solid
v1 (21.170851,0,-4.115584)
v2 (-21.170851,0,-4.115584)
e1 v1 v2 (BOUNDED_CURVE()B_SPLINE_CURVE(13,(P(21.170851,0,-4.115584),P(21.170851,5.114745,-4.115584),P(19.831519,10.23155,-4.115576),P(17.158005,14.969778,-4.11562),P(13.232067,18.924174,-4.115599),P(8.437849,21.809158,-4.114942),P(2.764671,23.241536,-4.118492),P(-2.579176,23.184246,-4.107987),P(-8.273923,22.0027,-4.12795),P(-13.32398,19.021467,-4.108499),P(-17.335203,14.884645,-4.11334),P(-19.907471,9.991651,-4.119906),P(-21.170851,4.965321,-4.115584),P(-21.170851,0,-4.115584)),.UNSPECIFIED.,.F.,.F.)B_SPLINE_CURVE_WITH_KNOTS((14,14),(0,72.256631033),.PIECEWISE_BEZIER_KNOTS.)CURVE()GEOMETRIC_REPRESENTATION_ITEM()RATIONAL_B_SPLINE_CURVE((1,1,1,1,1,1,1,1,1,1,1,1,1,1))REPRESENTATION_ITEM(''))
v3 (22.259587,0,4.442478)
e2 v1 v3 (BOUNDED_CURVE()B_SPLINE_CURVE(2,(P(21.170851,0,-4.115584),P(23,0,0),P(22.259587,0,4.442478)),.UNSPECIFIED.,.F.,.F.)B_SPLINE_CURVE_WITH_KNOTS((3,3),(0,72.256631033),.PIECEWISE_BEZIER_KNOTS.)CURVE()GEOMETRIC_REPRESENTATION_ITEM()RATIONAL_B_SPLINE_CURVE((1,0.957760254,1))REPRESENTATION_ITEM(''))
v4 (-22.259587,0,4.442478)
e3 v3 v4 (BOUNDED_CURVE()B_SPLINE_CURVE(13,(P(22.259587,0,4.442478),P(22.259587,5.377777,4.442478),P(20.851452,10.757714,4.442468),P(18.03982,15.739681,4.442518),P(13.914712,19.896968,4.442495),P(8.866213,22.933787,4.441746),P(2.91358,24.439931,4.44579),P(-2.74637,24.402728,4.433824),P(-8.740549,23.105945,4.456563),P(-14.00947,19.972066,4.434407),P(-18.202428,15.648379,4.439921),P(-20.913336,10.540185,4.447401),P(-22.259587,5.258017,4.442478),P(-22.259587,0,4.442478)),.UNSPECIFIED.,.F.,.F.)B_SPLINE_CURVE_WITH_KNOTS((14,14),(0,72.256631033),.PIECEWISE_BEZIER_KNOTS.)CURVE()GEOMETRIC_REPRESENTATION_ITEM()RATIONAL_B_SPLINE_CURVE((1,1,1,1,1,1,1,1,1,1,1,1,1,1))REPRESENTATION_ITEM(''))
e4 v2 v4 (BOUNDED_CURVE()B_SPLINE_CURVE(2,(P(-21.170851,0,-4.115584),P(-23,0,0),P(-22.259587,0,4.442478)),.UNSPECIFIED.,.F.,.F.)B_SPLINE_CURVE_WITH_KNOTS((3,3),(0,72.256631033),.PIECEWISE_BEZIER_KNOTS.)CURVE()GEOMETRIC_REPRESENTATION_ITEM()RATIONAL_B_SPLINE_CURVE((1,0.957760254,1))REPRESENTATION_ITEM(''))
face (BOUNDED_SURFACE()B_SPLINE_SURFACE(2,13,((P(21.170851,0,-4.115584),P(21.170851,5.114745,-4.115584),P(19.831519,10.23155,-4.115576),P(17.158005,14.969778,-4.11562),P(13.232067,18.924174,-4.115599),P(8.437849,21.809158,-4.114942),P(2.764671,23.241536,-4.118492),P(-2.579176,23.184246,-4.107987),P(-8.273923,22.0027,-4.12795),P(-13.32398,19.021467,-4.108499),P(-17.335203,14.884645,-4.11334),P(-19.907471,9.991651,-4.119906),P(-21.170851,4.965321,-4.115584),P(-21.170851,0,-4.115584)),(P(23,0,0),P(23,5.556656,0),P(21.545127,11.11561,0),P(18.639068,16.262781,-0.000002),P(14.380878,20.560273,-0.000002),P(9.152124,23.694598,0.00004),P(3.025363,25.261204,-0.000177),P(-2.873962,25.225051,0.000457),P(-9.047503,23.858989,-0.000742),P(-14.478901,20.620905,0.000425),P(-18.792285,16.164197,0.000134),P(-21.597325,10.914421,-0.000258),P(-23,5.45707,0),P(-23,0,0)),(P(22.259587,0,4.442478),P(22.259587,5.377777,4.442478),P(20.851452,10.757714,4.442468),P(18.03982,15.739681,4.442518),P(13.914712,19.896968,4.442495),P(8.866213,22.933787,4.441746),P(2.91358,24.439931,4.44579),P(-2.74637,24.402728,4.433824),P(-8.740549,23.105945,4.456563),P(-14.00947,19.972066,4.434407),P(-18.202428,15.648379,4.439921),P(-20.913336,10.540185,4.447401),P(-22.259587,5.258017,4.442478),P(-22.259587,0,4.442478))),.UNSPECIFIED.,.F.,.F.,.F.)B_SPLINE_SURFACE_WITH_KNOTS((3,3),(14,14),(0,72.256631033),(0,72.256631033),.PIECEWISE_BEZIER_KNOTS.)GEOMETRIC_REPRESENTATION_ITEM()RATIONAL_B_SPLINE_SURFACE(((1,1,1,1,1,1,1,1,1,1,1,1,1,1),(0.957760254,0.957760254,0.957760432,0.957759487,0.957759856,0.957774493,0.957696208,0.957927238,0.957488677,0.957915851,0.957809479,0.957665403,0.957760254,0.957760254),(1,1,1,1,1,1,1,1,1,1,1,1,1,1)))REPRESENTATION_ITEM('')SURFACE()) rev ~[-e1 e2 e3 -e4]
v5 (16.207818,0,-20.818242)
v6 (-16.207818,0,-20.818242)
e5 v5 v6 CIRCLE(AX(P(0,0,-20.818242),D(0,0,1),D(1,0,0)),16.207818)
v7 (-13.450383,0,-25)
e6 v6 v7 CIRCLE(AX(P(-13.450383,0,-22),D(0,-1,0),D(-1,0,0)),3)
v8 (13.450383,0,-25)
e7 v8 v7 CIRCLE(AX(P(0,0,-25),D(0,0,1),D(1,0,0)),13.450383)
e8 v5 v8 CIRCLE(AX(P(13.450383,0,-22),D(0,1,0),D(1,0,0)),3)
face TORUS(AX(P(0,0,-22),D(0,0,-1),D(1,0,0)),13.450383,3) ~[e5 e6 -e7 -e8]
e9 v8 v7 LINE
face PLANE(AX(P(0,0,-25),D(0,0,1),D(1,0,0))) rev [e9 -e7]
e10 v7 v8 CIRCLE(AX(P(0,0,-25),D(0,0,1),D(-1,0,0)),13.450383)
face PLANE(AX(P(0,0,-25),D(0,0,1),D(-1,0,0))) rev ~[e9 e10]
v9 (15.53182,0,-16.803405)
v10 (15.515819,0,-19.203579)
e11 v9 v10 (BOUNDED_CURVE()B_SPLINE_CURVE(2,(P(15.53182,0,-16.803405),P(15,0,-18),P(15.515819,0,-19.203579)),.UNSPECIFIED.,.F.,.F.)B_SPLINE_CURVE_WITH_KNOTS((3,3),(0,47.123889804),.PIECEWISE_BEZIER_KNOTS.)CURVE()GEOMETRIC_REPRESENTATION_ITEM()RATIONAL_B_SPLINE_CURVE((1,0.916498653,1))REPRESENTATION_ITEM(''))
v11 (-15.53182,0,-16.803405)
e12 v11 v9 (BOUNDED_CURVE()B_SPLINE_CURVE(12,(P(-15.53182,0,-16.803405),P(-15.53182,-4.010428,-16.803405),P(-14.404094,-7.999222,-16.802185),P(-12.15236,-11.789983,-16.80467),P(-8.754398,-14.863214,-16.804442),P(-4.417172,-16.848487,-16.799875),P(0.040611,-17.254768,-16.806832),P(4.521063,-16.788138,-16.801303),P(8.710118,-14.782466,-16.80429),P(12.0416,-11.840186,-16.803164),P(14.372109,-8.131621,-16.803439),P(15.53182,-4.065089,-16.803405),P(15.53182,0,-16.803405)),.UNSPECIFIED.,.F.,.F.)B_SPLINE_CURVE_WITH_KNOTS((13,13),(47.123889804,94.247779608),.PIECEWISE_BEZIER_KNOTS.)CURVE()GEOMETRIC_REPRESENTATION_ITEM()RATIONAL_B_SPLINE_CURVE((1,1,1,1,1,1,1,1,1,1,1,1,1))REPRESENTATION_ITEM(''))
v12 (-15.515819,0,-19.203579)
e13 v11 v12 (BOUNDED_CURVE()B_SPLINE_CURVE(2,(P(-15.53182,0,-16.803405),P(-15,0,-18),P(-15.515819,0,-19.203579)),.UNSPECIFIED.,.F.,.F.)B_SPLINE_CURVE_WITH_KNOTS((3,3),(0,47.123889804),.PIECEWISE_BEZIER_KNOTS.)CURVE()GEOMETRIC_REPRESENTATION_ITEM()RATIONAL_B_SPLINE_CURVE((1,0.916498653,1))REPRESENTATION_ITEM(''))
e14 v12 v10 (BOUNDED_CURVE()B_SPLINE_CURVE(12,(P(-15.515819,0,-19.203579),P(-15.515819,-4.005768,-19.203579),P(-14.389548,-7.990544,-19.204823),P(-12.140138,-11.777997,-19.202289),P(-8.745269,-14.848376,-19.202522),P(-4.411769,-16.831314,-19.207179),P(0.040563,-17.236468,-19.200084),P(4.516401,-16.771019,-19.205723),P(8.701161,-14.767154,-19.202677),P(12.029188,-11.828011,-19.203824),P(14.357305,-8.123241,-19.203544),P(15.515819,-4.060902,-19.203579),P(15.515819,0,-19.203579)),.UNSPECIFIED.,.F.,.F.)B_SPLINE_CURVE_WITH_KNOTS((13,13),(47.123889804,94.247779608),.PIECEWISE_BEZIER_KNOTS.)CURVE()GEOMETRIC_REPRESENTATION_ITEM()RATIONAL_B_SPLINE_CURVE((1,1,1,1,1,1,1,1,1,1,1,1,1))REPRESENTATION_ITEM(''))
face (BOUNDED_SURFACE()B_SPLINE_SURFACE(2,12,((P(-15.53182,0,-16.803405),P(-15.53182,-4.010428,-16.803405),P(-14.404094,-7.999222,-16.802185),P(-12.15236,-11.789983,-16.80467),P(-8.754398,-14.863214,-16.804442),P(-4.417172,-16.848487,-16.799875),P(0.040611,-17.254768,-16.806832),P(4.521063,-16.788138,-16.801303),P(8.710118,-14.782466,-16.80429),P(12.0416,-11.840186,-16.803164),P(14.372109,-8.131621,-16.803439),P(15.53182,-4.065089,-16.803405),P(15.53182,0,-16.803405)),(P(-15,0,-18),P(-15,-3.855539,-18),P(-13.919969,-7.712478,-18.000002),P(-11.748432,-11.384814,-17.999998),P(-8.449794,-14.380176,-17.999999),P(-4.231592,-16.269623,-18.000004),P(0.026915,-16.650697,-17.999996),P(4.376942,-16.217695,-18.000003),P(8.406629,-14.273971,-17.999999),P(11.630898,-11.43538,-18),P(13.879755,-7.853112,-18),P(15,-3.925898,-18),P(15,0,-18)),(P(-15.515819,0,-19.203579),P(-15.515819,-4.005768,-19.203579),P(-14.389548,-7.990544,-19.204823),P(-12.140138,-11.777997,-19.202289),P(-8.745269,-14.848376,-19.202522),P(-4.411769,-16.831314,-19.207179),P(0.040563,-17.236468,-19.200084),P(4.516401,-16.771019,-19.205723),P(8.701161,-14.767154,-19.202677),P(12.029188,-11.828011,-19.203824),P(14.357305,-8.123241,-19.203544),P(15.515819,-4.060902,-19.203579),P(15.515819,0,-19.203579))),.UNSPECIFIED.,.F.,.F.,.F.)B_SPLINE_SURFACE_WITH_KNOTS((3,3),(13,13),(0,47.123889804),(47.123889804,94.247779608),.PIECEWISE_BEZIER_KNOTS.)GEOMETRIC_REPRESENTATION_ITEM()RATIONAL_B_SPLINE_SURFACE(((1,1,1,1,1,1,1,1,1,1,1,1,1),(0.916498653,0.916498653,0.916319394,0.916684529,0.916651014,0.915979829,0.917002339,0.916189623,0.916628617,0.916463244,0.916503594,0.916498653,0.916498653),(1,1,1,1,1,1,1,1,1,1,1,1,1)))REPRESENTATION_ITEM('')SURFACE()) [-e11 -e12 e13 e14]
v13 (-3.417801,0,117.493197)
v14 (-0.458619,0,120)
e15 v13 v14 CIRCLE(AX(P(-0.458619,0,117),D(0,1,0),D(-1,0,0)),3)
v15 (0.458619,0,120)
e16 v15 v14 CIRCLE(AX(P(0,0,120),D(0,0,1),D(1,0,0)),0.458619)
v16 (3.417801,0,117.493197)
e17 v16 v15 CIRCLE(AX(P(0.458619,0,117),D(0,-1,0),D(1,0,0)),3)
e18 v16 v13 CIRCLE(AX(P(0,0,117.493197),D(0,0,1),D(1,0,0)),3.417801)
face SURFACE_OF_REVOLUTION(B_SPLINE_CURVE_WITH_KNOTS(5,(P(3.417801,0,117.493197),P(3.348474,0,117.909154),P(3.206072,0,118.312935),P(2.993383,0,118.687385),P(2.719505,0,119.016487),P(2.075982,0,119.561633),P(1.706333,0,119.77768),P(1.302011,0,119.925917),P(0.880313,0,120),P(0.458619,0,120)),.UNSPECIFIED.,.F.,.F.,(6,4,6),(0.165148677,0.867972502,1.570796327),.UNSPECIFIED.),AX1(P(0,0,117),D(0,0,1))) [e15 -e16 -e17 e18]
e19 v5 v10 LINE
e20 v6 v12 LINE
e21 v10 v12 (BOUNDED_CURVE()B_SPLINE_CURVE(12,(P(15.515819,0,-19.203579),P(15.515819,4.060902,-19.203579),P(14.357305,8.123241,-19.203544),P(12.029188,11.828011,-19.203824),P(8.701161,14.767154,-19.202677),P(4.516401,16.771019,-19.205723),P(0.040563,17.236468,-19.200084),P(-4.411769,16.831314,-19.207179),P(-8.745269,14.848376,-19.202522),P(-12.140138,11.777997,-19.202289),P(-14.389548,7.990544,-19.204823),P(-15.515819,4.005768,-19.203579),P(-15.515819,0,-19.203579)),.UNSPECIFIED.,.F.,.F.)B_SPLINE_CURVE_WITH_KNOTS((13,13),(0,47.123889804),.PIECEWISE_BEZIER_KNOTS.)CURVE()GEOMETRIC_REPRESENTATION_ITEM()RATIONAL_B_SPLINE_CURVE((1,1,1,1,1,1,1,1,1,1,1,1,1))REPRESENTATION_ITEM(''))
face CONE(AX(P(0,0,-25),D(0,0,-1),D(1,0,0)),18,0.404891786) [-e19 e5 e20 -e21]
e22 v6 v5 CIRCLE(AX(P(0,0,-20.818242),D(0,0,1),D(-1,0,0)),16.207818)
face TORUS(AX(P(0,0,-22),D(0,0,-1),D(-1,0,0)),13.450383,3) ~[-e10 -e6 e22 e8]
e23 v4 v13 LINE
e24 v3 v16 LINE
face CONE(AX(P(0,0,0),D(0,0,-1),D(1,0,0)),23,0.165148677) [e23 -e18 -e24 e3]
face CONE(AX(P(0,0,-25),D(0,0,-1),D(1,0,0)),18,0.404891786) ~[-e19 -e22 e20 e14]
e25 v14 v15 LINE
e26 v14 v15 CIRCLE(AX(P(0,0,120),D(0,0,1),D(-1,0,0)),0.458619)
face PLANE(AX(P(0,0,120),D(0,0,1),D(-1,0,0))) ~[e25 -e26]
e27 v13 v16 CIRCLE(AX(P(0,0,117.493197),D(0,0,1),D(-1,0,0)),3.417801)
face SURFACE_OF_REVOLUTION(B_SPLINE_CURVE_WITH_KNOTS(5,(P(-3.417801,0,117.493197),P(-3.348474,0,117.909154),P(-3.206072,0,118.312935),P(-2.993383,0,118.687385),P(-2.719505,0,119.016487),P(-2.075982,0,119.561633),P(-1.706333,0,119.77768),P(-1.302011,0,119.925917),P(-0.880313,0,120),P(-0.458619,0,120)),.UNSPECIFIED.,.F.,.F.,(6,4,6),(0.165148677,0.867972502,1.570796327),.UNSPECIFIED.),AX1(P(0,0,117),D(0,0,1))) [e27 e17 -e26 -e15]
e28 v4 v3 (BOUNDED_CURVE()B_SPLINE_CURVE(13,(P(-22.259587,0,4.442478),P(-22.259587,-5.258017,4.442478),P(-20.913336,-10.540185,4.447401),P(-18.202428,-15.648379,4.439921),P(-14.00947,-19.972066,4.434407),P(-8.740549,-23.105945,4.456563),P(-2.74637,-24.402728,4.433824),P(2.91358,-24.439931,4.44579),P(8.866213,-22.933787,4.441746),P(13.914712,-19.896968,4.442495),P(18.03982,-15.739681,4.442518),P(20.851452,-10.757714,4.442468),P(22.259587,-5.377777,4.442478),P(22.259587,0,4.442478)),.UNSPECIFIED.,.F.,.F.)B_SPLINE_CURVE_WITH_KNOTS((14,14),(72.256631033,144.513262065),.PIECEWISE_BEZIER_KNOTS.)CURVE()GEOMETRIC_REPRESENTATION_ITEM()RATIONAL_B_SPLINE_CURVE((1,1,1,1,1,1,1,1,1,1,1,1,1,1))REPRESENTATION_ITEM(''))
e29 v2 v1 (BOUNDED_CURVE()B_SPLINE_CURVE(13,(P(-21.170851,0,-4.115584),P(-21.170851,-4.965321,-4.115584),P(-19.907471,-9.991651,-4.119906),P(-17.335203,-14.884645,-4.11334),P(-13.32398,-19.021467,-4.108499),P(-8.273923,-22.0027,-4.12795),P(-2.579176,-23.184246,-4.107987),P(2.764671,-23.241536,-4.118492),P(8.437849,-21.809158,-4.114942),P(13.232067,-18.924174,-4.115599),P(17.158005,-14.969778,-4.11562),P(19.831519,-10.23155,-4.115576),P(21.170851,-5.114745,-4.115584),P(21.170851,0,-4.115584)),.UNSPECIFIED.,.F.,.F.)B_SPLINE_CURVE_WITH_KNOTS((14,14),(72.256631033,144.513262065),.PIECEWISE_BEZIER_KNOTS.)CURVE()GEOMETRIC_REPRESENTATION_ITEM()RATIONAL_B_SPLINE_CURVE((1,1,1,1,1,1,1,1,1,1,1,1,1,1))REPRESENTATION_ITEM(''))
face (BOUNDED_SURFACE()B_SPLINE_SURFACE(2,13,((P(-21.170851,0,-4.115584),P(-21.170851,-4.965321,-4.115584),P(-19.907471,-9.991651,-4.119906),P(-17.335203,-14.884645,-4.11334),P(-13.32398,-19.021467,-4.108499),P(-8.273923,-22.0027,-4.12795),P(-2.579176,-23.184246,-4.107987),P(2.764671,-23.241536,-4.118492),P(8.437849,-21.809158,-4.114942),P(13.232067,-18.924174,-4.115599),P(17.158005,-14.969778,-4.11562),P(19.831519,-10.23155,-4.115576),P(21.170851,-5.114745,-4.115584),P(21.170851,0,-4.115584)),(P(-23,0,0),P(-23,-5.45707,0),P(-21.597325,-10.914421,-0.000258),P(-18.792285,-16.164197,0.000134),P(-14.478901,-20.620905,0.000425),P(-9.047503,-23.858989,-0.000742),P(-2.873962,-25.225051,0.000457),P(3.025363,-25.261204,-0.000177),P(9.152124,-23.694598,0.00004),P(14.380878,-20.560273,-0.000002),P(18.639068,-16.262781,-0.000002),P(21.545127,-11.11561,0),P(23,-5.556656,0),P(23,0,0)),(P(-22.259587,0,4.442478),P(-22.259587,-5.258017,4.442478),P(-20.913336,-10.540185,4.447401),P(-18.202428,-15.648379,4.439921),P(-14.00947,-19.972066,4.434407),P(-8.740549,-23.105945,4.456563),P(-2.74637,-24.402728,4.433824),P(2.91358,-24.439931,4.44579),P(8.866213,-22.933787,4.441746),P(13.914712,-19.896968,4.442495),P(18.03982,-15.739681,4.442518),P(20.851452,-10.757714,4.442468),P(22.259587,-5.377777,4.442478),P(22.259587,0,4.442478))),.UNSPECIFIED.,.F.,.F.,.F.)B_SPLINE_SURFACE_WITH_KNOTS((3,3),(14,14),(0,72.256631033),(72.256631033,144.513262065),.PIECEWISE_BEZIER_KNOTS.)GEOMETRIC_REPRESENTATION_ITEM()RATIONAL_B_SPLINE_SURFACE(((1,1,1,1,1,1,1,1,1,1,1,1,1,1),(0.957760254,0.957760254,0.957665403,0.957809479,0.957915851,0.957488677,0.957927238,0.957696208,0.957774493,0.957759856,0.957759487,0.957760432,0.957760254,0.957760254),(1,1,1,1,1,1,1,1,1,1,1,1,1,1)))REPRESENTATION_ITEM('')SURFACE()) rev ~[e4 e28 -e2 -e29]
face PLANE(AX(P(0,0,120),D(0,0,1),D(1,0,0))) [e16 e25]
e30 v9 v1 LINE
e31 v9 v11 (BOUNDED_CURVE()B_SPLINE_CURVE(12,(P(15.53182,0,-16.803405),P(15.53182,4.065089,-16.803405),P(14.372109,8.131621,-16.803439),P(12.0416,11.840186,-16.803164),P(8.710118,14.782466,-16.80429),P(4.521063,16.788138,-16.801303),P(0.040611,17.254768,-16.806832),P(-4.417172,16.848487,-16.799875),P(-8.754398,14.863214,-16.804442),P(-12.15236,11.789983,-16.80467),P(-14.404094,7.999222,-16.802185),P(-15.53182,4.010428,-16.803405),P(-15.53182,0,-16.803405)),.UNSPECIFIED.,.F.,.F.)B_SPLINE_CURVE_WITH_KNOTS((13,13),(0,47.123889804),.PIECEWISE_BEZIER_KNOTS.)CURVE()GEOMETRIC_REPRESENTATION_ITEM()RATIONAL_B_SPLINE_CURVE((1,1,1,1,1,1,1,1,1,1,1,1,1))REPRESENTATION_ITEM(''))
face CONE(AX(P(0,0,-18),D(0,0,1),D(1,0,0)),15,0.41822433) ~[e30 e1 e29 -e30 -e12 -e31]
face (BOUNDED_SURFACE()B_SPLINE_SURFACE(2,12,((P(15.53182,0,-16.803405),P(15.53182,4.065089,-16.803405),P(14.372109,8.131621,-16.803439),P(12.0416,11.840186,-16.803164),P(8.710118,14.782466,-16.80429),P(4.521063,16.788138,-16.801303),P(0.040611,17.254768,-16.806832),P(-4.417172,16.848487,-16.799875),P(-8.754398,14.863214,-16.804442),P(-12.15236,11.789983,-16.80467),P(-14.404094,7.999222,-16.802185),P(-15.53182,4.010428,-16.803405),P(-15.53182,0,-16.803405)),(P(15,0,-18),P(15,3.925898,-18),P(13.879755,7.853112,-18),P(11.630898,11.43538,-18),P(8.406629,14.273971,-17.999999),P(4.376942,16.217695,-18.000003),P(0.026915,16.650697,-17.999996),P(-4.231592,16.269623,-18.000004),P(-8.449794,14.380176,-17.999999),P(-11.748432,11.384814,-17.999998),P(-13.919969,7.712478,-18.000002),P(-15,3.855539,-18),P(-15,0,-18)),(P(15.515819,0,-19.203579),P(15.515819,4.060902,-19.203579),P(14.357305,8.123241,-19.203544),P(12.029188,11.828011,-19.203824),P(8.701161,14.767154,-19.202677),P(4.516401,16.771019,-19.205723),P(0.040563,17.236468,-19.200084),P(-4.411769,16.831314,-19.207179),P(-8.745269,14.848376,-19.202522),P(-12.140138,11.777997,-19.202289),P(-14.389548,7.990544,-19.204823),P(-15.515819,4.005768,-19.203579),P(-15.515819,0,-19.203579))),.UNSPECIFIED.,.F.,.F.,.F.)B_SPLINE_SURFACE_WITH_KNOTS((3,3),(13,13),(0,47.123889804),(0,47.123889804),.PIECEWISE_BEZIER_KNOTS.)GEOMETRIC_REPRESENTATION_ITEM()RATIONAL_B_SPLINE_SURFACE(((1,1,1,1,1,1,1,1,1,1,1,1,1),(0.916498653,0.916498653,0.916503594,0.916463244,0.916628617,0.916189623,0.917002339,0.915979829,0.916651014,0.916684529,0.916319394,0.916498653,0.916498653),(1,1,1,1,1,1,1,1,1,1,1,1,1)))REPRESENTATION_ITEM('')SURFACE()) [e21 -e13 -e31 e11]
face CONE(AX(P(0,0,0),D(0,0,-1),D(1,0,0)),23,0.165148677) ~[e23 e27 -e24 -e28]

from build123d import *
from build123d import SkipClean  # not in build123d's __all__

# Parameters (mm, degrees)
F1_ANGLE = 180
F3_R     = 3
F4_R     = 3
F5_R     = 15


with BuildPart() as f1:
    # F0 (on Front) → F1 (revolve)
    with BuildSketch(Plane.XZ):
        Polygon((15, -18), (23, 0), (3, 120), (0, 120), (0, -25), (18, -25), align=None)
    revolve(axis=Axis((0, 0, 130.329349637), (0, 0, 1)), revolution_arc=F1_ANGLE)

    # F2: F1 across plane


with BuildPart() as f1_1:
    add(f1.part, clean=False)
    with SkipClean():  # cleaning this boolean's faces spoils the solid; the shape is the same uncleaned
        add(f1.part.mirror(Plane.XZ), clean=False)

    # F3
    f3_edges = [f1_1.edges().sort_by_distance(p)[0] for p in [
        (0, 3, 120),
        (0, -3, 120),
    ]]
    fillet(f3_edges, radius=F3_R)

    # F4
    f4_edges = [f1_1.edges().sort_by_distance(p)[0] for p in [
        (0, 15, -18),
        (0, -15, -18),
        (0, 18, -25),
        (0, -18, -25),
    ]]
    fillet(f4_edges, radius=F4_R)

    # F5
    f5_edges = [f1_1.edges().sort_by_distance(p)[0] for p in [
        (0, 23, 0),
        (0, -23, 0),
    ]]
    fillet(f5_edges, radius=F5_R)


solid = f1_1.part
